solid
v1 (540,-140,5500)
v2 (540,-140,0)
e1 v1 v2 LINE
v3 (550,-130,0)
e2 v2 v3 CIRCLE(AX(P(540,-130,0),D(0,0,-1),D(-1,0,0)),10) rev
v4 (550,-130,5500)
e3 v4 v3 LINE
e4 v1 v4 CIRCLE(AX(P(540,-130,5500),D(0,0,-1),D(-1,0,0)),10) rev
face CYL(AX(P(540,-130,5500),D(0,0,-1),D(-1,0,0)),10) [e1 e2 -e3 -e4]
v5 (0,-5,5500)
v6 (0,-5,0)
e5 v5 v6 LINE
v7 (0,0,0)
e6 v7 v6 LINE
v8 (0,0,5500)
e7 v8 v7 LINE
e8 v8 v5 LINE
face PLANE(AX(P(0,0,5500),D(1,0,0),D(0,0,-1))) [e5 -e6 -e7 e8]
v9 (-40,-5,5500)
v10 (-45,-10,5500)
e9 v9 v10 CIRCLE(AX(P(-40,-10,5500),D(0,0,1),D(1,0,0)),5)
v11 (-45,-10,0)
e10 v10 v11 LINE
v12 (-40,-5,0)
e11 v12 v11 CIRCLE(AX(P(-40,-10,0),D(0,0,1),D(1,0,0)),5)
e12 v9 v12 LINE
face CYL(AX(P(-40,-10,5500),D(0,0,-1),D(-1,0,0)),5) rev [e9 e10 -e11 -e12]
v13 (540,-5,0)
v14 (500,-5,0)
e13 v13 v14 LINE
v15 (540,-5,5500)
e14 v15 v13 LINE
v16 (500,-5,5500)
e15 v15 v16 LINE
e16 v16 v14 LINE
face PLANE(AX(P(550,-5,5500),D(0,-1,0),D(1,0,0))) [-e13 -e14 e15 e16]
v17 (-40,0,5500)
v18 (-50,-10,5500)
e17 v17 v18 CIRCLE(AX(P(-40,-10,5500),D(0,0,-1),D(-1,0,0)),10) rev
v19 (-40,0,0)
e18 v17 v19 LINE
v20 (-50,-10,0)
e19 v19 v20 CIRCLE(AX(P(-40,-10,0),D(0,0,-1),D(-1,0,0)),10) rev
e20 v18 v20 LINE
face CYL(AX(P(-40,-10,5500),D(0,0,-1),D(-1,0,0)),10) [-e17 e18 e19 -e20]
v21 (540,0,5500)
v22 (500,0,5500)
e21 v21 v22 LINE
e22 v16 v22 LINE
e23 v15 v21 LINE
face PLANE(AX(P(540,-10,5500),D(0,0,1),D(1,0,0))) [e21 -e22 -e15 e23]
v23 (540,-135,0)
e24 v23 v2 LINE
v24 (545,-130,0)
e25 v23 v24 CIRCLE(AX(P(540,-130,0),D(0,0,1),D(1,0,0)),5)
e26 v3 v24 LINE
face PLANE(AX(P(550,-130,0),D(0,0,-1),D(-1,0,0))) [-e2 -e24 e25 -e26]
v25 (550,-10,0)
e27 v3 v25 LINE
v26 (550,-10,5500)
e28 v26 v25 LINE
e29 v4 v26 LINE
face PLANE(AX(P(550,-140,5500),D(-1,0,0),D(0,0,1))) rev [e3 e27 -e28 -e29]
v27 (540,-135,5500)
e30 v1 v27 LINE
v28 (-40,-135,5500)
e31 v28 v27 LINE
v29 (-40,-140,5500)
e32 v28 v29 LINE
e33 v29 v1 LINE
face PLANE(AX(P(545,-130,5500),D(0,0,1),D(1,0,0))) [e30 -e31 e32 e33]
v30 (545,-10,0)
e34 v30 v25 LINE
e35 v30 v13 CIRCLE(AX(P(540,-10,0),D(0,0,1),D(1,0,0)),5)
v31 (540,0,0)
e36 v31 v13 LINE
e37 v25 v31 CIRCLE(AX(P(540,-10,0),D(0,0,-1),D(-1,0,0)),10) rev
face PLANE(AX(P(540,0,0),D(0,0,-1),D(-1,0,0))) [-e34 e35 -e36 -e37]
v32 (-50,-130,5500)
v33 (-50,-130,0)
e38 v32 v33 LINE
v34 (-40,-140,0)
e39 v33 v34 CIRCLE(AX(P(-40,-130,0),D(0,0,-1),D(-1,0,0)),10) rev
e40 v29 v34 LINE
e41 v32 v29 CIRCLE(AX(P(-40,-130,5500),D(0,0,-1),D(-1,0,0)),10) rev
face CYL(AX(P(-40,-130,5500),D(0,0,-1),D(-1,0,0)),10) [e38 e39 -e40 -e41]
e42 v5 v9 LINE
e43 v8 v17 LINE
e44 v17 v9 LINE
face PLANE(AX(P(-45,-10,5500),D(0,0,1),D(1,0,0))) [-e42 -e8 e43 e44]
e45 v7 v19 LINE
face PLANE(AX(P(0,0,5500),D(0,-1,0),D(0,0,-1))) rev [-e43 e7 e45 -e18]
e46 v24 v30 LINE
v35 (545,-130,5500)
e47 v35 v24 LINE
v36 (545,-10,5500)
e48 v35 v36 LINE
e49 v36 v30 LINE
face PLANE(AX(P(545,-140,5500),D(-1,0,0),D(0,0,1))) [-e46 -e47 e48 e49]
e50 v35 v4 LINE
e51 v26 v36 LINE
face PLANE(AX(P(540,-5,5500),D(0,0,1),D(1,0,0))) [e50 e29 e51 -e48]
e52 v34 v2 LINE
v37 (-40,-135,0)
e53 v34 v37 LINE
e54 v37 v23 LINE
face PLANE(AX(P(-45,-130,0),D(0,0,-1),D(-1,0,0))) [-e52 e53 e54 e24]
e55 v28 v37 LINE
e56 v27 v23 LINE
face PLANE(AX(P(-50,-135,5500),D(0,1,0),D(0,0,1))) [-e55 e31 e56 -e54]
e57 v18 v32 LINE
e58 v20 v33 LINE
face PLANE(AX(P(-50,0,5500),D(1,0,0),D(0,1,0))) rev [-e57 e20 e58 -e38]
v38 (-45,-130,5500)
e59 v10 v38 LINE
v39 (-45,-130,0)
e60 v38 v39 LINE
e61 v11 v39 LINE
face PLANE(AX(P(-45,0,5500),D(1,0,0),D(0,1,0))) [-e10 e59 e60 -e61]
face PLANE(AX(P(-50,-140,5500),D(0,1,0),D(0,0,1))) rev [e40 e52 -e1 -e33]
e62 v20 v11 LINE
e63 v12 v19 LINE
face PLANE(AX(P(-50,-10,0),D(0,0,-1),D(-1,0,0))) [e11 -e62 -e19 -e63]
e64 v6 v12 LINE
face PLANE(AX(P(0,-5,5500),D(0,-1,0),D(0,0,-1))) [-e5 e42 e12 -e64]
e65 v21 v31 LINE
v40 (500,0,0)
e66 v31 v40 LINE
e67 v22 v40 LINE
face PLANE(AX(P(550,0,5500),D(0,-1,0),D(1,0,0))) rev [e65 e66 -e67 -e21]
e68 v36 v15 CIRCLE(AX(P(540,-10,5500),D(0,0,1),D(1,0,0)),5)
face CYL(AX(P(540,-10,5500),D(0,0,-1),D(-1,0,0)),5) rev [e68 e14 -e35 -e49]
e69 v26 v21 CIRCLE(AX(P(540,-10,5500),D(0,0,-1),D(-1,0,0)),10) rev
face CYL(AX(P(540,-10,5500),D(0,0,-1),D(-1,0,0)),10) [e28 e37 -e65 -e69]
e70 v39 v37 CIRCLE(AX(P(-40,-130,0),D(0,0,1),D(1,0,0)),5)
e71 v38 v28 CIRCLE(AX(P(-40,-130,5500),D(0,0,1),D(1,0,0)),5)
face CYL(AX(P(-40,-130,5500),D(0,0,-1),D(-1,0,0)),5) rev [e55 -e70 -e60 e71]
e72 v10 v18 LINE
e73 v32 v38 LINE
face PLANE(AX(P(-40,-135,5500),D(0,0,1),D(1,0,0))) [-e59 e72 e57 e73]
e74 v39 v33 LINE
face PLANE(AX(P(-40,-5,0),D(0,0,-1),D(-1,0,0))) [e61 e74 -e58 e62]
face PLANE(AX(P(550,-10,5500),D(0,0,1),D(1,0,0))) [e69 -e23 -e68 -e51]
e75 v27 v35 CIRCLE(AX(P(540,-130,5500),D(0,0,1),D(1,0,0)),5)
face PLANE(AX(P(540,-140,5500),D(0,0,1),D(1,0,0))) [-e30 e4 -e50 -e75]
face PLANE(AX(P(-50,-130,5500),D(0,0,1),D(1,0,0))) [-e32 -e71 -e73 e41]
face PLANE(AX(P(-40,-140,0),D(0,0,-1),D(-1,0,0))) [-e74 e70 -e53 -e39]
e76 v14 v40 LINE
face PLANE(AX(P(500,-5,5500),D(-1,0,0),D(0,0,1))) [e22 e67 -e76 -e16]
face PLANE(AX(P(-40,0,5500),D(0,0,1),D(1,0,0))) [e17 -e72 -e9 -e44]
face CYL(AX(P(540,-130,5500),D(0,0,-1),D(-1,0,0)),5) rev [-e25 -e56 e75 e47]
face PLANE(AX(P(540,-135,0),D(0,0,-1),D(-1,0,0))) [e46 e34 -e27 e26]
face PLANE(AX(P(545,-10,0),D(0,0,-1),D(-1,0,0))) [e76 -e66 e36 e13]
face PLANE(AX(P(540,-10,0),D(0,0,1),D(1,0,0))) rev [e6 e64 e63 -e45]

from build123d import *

# Parameters (mm, degrees)
TABAN_FLAN_1_DEPTH = 5500


# Sheet-metal steps are written as plain solids
with BuildPart() as part:
    # Çizim1 → Taban-Flanş1 (new body)
    with BuildSketch(Plane.XY):
        with BuildLine():
            Line((0, 0), (-40, 0))
            ThreePointArc((-40, 0), (-47.071067812, -2.928932188), (-50, -10))
            Line((-50, -10), (-50, -130))
            ThreePointArc((-50, -130), (-47.071067812, -137.071067812), (-40, -140))
            Line((-40, -140), (540, -140))
            ThreePointArc((540, -140), (547.071067812, -137.071067812), (550, -130))
            Line((550, -130), (550, -10))
            ThreePointArc((550, -10), (547.071067812, -2.928932188), (540, 0))
            Line((540, 0), (500, 0))
            Line((500, 0), (500, -5))
            Line((500, -5), (540, -5))
            ThreePointArc((540, -5), (543.535533906, -6.464466094), (545, -10))
            Line((545, -10), (545, -130))
            ThreePointArc((545, -130), (543.535533906, -133.535533906), (540, -135))
            Line((540, -135), (-40, -135))
            ThreePointArc((-40, -135), (-43.535533906, -133.535533906), (-45, -130))
            Line((-45, -130), (-45, -10))
            ThreePointArc((-45, -10), (-43.535533906, -6.464466094), (-40, -5))
            Line((-40, -5), (0, -5))
            Line((0, -5), (0, 0))
        make_face()
    extrude(amount=TABAN_FLAN_1_DEPTH)


solid = part.part
